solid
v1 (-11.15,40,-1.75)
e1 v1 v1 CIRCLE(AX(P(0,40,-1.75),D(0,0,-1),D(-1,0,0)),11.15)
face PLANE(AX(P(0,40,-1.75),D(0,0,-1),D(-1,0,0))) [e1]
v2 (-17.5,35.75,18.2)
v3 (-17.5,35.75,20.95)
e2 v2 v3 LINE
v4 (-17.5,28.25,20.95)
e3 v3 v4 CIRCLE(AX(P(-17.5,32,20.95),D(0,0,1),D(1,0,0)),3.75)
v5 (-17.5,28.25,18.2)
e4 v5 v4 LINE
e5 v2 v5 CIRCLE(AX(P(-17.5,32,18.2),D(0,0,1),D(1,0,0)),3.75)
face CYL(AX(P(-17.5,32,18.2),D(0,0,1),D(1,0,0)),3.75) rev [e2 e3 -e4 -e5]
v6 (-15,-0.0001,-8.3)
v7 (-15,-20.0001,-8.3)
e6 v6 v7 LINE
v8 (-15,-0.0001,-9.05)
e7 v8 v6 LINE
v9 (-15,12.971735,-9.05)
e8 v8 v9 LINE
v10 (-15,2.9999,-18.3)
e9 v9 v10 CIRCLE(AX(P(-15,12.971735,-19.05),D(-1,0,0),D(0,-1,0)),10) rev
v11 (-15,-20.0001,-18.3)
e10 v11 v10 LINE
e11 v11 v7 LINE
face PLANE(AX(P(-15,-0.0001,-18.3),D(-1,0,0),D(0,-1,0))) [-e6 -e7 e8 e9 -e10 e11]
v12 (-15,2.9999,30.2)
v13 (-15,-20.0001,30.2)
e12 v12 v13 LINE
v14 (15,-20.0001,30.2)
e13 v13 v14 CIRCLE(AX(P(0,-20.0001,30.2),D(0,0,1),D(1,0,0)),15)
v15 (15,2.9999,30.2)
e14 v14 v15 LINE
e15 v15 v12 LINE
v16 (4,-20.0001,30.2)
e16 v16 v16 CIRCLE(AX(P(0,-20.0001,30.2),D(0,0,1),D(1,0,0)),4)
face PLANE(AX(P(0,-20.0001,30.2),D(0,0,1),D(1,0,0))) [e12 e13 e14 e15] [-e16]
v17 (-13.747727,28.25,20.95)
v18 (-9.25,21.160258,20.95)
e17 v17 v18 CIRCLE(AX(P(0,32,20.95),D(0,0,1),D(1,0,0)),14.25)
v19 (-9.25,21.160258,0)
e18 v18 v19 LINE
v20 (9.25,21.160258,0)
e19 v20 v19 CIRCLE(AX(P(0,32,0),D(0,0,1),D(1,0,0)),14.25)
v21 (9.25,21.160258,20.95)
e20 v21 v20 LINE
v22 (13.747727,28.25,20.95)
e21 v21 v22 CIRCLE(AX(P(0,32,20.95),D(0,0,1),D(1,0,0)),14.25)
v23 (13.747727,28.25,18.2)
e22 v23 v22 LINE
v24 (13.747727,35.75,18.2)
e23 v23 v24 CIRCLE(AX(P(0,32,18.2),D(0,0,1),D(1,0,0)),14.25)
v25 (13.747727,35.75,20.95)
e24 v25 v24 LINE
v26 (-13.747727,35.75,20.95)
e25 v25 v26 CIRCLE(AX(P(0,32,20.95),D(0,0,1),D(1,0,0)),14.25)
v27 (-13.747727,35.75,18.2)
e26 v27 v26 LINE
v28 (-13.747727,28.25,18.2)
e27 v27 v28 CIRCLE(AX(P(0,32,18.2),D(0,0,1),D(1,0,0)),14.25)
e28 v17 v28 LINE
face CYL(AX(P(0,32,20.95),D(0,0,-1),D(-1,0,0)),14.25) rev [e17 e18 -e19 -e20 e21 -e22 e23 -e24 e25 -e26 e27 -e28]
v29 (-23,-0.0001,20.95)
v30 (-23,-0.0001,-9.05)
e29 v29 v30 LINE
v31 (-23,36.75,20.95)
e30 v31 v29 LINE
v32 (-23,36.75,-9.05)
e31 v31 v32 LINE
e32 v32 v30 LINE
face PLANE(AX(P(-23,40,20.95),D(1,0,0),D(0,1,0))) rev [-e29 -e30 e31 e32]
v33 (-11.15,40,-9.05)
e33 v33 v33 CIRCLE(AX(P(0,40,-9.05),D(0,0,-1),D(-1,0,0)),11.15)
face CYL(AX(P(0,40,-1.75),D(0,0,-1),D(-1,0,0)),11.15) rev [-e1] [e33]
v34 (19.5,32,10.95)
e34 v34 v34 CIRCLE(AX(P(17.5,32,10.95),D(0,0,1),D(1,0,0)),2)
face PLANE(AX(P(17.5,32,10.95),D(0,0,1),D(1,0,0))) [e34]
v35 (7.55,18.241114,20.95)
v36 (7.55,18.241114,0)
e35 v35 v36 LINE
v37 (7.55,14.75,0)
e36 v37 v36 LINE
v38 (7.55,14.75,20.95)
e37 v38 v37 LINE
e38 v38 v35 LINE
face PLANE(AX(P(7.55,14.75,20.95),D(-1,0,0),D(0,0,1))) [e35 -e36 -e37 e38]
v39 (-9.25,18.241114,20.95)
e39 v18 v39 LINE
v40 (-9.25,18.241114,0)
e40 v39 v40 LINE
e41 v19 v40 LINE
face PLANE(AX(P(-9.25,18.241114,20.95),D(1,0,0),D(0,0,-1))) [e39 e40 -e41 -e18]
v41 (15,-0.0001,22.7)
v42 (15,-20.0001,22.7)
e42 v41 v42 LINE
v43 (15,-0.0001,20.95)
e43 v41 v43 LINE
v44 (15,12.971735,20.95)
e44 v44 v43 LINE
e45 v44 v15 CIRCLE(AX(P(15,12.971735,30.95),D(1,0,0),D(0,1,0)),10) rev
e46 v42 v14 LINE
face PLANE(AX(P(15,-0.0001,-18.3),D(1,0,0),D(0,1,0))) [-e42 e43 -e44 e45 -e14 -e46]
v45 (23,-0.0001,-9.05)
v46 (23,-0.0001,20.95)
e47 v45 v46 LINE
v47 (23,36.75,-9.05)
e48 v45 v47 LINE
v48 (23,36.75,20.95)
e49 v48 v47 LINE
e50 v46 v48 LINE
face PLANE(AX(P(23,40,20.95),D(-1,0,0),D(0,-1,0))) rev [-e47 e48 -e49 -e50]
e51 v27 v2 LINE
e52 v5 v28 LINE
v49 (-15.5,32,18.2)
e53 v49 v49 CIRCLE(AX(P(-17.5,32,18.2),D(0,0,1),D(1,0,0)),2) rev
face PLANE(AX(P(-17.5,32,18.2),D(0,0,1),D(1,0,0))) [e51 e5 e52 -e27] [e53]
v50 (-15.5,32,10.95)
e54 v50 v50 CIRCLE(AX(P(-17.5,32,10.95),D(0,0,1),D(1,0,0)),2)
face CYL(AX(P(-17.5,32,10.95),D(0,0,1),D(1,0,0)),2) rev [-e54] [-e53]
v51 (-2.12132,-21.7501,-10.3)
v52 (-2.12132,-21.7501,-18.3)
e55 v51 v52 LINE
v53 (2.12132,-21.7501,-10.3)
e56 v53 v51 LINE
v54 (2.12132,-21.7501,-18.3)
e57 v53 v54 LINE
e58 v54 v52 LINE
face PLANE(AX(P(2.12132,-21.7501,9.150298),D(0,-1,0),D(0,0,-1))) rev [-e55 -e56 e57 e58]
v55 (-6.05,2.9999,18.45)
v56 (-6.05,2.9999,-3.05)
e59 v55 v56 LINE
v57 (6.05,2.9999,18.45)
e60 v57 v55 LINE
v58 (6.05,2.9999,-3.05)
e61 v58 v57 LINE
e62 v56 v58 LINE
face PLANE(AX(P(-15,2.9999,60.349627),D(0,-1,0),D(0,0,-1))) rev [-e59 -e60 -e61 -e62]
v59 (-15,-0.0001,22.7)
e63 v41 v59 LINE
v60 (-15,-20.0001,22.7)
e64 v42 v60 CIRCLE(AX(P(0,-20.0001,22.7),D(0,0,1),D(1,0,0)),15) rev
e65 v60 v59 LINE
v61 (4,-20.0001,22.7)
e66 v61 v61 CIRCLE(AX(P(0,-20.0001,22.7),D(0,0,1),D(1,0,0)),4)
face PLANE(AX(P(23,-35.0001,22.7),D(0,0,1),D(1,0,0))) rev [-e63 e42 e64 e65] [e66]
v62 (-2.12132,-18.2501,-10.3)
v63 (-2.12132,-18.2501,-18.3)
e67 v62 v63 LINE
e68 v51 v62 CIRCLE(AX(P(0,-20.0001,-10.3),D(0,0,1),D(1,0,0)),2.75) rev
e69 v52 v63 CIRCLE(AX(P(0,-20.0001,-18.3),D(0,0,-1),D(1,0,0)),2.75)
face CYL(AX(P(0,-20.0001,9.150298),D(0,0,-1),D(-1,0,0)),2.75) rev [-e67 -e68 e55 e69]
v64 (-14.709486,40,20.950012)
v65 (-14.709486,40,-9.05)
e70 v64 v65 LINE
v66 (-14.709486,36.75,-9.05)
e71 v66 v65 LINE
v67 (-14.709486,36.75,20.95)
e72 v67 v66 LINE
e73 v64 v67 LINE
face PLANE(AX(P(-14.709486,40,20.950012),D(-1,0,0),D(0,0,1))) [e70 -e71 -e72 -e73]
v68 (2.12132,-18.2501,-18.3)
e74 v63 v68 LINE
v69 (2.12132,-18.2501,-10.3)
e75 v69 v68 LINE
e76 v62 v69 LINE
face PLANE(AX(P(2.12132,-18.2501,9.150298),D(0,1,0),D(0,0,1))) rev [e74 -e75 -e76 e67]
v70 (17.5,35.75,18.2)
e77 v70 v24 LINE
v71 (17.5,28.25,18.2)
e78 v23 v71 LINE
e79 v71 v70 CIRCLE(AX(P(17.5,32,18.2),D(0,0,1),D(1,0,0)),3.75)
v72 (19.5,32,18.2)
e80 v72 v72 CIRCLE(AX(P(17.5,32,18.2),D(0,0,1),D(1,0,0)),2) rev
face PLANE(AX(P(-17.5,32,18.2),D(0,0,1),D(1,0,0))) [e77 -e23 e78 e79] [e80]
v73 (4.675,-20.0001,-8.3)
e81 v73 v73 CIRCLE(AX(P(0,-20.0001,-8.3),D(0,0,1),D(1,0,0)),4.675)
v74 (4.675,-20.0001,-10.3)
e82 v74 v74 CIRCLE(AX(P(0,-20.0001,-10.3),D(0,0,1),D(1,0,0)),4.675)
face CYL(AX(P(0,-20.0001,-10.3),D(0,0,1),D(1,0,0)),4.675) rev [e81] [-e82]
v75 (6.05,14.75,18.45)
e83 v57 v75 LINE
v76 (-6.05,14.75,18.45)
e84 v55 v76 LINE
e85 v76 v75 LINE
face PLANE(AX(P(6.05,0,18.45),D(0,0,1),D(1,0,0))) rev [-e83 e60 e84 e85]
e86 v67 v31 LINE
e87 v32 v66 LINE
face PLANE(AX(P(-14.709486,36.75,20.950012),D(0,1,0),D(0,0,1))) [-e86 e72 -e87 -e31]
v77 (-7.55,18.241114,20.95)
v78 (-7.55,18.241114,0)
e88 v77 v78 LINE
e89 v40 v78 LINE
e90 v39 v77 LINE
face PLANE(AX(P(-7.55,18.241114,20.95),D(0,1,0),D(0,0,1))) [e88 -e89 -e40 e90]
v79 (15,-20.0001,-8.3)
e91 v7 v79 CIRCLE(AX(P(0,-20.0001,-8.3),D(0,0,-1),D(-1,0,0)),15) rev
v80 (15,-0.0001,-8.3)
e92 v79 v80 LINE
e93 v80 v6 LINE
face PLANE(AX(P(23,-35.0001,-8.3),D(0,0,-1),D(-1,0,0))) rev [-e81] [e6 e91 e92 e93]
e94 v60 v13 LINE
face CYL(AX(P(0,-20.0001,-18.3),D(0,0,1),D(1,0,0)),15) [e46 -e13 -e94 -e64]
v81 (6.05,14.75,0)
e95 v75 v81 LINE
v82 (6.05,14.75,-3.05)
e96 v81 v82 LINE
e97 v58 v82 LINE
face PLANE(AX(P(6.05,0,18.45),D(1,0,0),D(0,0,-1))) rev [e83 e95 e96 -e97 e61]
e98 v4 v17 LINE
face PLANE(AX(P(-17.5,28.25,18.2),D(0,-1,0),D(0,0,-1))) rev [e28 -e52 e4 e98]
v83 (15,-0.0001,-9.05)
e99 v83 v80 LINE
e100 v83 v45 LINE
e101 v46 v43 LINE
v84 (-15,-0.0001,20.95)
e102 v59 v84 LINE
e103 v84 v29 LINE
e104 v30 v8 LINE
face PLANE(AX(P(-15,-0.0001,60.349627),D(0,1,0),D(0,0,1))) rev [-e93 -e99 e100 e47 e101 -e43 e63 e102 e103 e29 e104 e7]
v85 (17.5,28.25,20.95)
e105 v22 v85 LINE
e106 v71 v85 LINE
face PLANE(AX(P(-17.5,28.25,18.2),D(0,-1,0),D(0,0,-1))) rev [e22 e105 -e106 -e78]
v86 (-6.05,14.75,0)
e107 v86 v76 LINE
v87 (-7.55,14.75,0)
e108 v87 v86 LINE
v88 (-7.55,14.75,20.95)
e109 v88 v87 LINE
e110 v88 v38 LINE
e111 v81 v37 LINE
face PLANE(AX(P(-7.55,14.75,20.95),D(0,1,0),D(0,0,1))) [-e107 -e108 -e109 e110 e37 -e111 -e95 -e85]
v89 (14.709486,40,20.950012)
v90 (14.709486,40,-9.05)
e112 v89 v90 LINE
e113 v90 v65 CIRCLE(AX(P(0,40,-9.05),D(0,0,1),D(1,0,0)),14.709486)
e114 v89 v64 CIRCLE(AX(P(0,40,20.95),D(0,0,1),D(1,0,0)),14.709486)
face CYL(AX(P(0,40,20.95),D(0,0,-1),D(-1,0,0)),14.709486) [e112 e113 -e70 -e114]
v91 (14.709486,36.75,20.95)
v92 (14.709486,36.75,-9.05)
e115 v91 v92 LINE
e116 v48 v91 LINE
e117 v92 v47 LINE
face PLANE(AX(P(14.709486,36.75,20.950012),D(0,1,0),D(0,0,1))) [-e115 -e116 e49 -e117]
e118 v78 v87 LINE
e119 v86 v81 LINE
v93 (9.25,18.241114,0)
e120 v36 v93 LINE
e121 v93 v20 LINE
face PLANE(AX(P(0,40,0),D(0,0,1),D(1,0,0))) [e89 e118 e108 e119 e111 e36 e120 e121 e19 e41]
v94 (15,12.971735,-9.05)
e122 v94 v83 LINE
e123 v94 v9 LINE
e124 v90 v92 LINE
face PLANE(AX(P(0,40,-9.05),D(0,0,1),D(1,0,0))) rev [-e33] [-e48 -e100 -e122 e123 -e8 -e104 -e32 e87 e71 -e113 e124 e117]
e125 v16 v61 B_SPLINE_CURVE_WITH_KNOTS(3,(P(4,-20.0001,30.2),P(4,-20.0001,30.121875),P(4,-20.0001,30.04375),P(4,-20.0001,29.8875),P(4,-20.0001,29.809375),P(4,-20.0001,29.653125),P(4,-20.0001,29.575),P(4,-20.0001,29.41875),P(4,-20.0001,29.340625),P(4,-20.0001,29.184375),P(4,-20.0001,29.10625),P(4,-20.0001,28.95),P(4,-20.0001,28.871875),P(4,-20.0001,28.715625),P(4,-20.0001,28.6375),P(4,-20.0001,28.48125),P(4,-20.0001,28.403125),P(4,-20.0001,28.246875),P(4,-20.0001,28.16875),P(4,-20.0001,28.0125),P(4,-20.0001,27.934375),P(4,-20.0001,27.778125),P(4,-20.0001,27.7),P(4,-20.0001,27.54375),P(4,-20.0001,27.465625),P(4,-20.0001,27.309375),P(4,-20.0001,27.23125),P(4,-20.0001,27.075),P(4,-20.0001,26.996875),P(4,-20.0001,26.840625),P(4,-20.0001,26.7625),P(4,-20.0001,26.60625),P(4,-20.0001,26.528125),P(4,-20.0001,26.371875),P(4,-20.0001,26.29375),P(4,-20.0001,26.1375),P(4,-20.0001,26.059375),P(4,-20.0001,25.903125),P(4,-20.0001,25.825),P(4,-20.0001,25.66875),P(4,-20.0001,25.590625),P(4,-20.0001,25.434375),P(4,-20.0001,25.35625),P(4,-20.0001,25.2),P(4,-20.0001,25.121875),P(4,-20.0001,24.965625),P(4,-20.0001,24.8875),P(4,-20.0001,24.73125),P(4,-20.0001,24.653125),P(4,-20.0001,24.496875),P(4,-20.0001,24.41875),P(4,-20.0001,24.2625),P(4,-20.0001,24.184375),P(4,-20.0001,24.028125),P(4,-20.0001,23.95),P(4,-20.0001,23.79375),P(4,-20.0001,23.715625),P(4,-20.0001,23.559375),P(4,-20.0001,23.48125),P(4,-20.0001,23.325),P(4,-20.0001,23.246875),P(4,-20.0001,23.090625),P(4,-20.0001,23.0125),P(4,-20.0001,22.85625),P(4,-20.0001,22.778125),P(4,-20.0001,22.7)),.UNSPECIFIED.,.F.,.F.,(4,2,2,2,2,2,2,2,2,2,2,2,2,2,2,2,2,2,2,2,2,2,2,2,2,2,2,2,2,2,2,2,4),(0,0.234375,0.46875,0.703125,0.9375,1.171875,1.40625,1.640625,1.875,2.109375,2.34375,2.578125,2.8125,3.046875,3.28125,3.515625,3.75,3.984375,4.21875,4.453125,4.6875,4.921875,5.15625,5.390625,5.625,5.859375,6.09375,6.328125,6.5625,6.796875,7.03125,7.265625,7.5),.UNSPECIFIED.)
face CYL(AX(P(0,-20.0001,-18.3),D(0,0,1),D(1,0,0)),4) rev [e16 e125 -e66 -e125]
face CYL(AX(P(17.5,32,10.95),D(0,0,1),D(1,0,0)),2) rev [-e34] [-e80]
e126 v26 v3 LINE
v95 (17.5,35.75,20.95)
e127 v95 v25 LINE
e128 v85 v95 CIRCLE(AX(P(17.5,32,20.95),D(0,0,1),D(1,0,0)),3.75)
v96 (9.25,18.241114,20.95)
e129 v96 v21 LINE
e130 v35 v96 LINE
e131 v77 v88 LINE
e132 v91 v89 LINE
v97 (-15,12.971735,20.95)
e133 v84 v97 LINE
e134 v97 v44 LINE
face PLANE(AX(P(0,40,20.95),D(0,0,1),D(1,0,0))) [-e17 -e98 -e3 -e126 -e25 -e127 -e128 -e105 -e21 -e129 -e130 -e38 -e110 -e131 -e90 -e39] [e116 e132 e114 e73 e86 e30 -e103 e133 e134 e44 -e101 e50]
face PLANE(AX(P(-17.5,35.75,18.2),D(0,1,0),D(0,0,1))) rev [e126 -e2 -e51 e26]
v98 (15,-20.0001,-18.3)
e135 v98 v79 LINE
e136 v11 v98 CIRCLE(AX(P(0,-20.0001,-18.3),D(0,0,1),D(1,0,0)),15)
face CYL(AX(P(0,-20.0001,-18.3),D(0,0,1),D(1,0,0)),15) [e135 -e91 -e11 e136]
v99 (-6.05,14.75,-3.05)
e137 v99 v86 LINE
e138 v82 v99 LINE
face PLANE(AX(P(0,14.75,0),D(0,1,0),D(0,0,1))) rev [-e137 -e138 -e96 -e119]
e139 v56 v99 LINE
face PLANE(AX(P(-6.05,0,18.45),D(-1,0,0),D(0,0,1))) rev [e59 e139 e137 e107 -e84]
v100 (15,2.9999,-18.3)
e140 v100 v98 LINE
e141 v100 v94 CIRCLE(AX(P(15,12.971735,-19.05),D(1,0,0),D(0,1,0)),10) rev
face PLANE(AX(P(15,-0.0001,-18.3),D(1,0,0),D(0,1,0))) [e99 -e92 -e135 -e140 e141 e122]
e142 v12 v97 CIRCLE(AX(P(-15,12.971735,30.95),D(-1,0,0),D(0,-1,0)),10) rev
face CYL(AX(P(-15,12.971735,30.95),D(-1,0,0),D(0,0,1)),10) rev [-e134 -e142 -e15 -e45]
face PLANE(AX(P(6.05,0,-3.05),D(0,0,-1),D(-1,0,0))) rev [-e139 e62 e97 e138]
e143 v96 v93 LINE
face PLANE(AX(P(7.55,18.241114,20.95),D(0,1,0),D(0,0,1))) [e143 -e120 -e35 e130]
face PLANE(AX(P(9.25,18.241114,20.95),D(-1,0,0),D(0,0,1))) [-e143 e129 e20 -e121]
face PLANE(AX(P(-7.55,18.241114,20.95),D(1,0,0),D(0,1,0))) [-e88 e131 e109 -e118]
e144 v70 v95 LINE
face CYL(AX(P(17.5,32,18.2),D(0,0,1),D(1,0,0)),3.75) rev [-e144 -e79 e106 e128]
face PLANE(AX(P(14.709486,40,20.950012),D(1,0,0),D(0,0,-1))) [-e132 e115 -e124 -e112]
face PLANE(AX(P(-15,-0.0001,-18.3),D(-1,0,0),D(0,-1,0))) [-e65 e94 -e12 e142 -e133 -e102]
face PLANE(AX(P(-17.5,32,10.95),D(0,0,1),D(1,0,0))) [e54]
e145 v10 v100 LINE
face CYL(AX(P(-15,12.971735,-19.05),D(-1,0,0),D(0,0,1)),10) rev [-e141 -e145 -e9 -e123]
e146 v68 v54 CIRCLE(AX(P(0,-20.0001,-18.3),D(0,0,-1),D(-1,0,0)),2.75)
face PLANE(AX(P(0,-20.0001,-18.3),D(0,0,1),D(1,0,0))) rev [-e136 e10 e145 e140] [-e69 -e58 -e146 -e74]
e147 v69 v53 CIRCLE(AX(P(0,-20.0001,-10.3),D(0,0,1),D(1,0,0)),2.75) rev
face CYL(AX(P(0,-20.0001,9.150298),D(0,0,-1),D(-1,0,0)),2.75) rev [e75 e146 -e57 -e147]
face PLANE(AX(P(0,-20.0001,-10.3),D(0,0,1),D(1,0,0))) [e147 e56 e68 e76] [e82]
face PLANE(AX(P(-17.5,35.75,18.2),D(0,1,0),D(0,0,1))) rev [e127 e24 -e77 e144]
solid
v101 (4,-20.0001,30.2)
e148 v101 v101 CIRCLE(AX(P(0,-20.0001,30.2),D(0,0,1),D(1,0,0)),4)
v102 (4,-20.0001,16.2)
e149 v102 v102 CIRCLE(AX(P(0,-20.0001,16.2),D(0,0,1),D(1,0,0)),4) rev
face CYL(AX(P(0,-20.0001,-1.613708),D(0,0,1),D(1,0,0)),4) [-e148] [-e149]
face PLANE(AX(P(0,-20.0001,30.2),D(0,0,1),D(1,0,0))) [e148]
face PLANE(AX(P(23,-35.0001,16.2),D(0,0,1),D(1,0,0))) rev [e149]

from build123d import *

# Parameters (mm, degrees)
BOSS_EXTRUDE1_DEPTH      = 20.95
BOSS_EXTRUDE2_START      = -9.05
BOSS_EXTRUDE2_DEPTH      = 9.05
SKETCH6_R                = 2
CUT_EXTRUDE2_DEPTH       = 10
CUT_EXTRUDE3_DEPTH       = 2.75
CUT_EXTRUDE4_DEPTH       = 67.499081444
CUT_EXTRUDE4_DEPTH_BACK  = 67.499081444
SKETCH8_W                = 8.290514233
SKETCH8_H                = 3.25
SKETCH11_R               = 11.15
BEARING_HOLE_DEPTH       = 7.3
SKETCH9_W                = 12.1
SKETCH9_H                = 21.5
WIRE_HOLE_DEPTH          = 62.170258319
SKETCH12_W               = 46
SKETCH12_H               = 30
BOSS_EXTRUDE3_DEPTH      = 0.0001
BOSS_EXTRUDE4_DEPTH      = 9.25
BOSS_EXTRUDE4_DEPTH_BACK = 39.25
SKETCH14_W               = 31
SKETCH14_H               = 35
CUT_EXTRUDE5_DEPTH       = 74.138005393
SKETCH15_R               = 4
CUT_EXTRUDE6_DEPTH       = 77.644489906
SKETCH17_R               = 6.169612062
BOSS_EXTRUDE5_DEPTH      = 10
SKETCH18_R               = 4
BOSS_EXTRUDE6_DEPTH      = 14
SKETCH19_R               = 4.675
CUT_EXTRUDE7_DEPTH       = 2
BOSS_EXTRUDE7_START      = -39.25
SKETCH20_W               = 30
SKETCH20_H               = 3
BOSS_EXTRUDE7_DEPTH      = 48.5
FILLET1_R                = 10


with BuildPart() as part:
    # Sketch2 → Boss-Extrude1 (new body)
    with BuildSketch(Plane.XY):
        with BuildLine():
            Line((-14.709485767, 40), (-23, 40))
            Line((-23, 40), (-23, 0))
            Line((-23, 0), (23, 0))
            Line((23, 0), (23, 40))
            Line((23, 40), (14.709485767, 40))
            ThreePointArc((14.709485767, 40), (0, 54.709485767), (-14.709485767, 40))
        make_face()
        with BuildLine():
            Line((-7.55, 18.241114036), (-7.55, 14.75))
            Line((-7.55, 14.75), (7.55, 14.75))
            Line((7.55, 14.75), (7.55, 18.241114036))
            Line((7.55, 18.241114036), (9.25, 18.241114036))
            Line((9.25, 18.241114036), (9.25, 21.160258306))
            ThreePointArc((9.25, 21.160258306), (0, 46.25), (-9.25, 21.160258306))
            Line((-9.25, 21.160258306), (-9.25, 18.241114036))
            Line((-9.25, 18.241114036), (-7.55, 18.241114036))
        make_face(mode=Mode.SUBTRACT)
    extrude(amount=BOSS_EXTRUDE1_DEPTH)

    # Sketch3 → Boss-Extrude2 (add)
    with BuildSketch(Plane.XY.offset(BOSS_EXTRUDE2_START)):
        with BuildLine():
            Line((-14.709485767, 40), (-23, 40))
            Line((-23, 40), (-23, 0))
            Line((-23, 0), (23, 0))
            Line((23, 0), (23, 40))
            Line((23, 40), (14.709485767, 40))
            ThreePointArc((14.709485767, 40), (0, 54.709485767), (-14.709485767, 40))
        make_face()
    extrude(amount=BOSS_EXTRUDE2_DEPTH)

    # Sketch6 → Cut-Extrude2 (cut)
    with BuildSketch(Plane.XY.offset(20.95)):
        with Locations((-17.5, 32)):
            Circle(SKETCH6_R)
        with Locations((17.5, 32)):
            Circle(SKETCH6_R)
    extrude(amount=-CUT_EXTRUDE2_DEPTH, mode=Mode.SUBTRACT)

    # Sketch7 → Cut-Extrude3 (cut)
    with BuildSketch(Plane.XY.offset(20.95)):
        with BuildLine():
            Line((-17.5, 35.75), (17.5, 35.75))
            ThreePointArc((17.5, 35.75), (21.25, 32), (17.5, 28.25))
            Line((17.5, 28.25), (-17.5, 28.25))
            ThreePointArc((-17.5, 28.25), (-21.25, 32), (-17.5, 35.75))
        make_face()
    extrude(amount=-CUT_EXTRUDE3_DEPTH, mode=Mode.SUBTRACT)

    # Sketch8 → Cut-Extrude4 (cut, two sides: drawn at the far end of the back side and taken through both)
    with BuildSketch(Plane.XY.offset(20.95).offset(-CUT_EXTRUDE4_DEPTH_BACK)):
        with Locations((-18.854742884, 38.375)):
            Rectangle(SKETCH8_W, SKETCH8_H)
        with Locations((18.854742884, 38.375)):
            Rectangle(SKETCH8_W, SKETCH8_H)
    extrude(amount=CUT_EXTRUDE4_DEPTH + CUT_EXTRUDE4_DEPTH_BACK, mode=Mode.SUBTRACT)

    # Sketch11 → Bearing Hole (cut)
    with BuildSketch(Plane(origin=(0, 0, -9.05), x_dir=(-1, 0, 0), z_dir=(0, 0, -1))):
        with Locations((0, 40)):
            Circle(SKETCH11_R)
    extrude(amount=-BEARING_HOLE_DEPTH, mode=Mode.SUBTRACT)

    # Sketch9 → Wire Hole (cut, through all)
    with BuildSketch(Plane(origin=(0, 14.75, -19.25), x_dir=(-1, 0, 0), z_dir=(0, 1, 0))):
        with Locations((0, 26.95)):
            Rectangle(SKETCH9_W, SKETCH9_H)
    extrude(amount=-WIRE_HOLE_DEPTH, mode=Mode.SUBTRACT)

    # Sketch12 → Boss-Extrude3 (add)
    with BuildSketch(Plane.XZ):
        with Locations((0, 5.95)):
            Rectangle(SKETCH12_W, SKETCH12_H)
    extrude(amount=BOSS_EXTRUDE3_DEPTH)

    # Sketch13 → Boss-Extrude4 (add, two sides: drawn at the far end of the back side and taken through both)
    with BuildSketch(Plane.XY.offset(20.95).offset(-BOSS_EXTRUDE4_DEPTH_BACK)):
        with BuildLine():
            Line((-15, -0.0001), (15, -0.0001))
            Line((15, -0.0001), (15, -20.0001))
            ThreePointArc((15, -20.0001), (0, -35.0001), (-15, -20.0001))
            Line((-15, -20.0001), (-15, -0.0001))
        make_face()
    extrude(amount=BOSS_EXTRUDE4_DEPTH + BOSS_EXTRUDE4_DEPTH_BACK)

    # Sketch14 → Cut-Extrude5 (cut, through all)
    with BuildSketch(Plane.ZY.offset(15)):
        with Locations((7.2, -17.5001)):
            Rectangle(SKETCH14_W, SKETCH14_H)
    extrude(amount=-CUT_EXTRUDE5_DEPTH, mode=Mode.SUBTRACT)


with BuildPart() as cut_extrude5_piece_1:
    # of the separate pieces the step leaves, piece 1, a body of its own (cut_extrude5_pieces)
    add(part.part.solids().sort_by_distance((14.709485767, 40, 20.95))[0])


with BuildPart() as cut_extrude5_piece_2:
    # of the separate pieces the step leaves, piece 2, a body of its own (cut_extrude5_pieces)
    add(part.part.solids().sort_by_distance((-15, -0.0001, 30.2))[0])


with BuildPart() as cut_extrude6_tool:
    # Sketch15 → Cut-Extrude6 (new, through all)
    with BuildSketch(Plane.XY.offset(30.2)):
        with Locations((0, -20.0001)):
            Circle(SKETCH15_R)
    extrude(amount=-CUT_EXTRUDE6_DEPTH)


with BuildPart() as cut_extrude5_piece_1_1:
    add(cut_extrude5_piece_1.part)

    # Cut-Extrude6: cut by cut_extrude6_tool
    add(cut_extrude6_tool.part, mode=Mode.SUBTRACT)

    # Sketch17 → Boss-Extrude5 (add)
    with BuildSketch(Plane(origin=(0, 0, -18.3), x_dir=(-1, 0, 0), z_dir=(0, 0, -1))):
        with Locations((0, -20.0001)):
            Circle(SKETCH17_R)
        with BuildLine():
            Line((-2.121320344, -18.2501), (2.121320344, -18.2501))
            ThreePointArc((2.121320344, -18.2501), (2.75, -20.0001), (2.121320344, -21.7501))
            Line((2.121320344, -21.7501), (-2.121320344, -21.7501))
            ThreePointArc((-2.121320344, -21.7501), (-2.75, -20.0001), (-2.121320344, -18.2501))
        make_face(mode=Mode.SUBTRACT)
    extrude(amount=-BOSS_EXTRUDE5_DEPTH)

    # Sketch19 → Cut-Extrude7 (cut)
    with BuildSketch(Plane.XY.offset(-8.3)):
        with Locations((0, -20.0001)):
            Circle(SKETCH19_R)
    extrude(amount=-CUT_EXTRUDE7_DEPTH, mode=Mode.SUBTRACT)



with BuildPart() as cut_extrude5_piece_2_1:
    add(cut_extrude5_piece_2.part)

    # Cut-Extrude6: cut by cut_extrude6_tool
    add(cut_extrude6_tool.part, mode=Mode.SUBTRACT)


with BuildPart() as body_3:
    # Sketch18 → Boss-Extrude6 (new body)
    with BuildSketch(Plane.XY.offset(30.2)):
        with Locations((0, -20.0001)):
            Circle(SKETCH18_R)
    extrude(amount=-BOSS_EXTRUDE6_DEPTH)


with BuildPart() as cut_extrude5_piece_1_2:
    add(cut_extrude5_piece_1_1.part)

    add(cut_extrude5_piece_2_1.part)  # Boss-Extrude7 merges Cut-Extrude5 piece 2
    # Sketch20 → Boss-Extrude7 (add)
    with BuildSketch(Plane.XY.offset(20.95).offset(BOSS_EXTRUDE7_START)):
        with Locations((0, 1.4999)):
            Rectangle(SKETCH20_W, SKETCH20_H)
    extrude(amount=BOSS_EXTRUDE7_DEPTH)

    # Fillet1
    # the kernel refuses this fillet: 10 mm, written as the material it adds along each edge
    with BuildSketch(Plane(origin=(-15, 2.9999, -9.05), x_dir=(0, 0, -1), z_dir=(1, 0, 0))) as fillet1_piece_1:
        with BuildLine():
            CenterArc((10, 9.971835338), FILLET1_R, 180, 85.698777695)
            Line((0, 9.971835338), (-0.2, 9.971835338))
            Line((-0.2, 9.971835338), (-0.2, 0))
            Line((-0.2, 0), (0, -0.2))
            ThreePointArc((0, -0.2), (4.625, -0.2), (9.235, -0.199436707))
            Line((9.235, -0.199436707), (9.25, 0))
        make_face()
    extrude(amount=30)
    with BuildSketch(Plane(origin=(-15, 2.9999, 20.95), x_dir=(0, 1, 0), z_dir=(1, 0, 0))) as fillet1_piece_2:
        with BuildLine():
            CenterArc((9.971835338, 10), FILLET1_R, 184.301222305, 85.698777695)
            Line((0, 9.25), (-0.199436707, 9.235))
            ThreePointArc((-0.199436707, 9.235), (-0.2, 4.625), (-0.2, 0))
            Line((-0.2, 0), (0, -0.2))
            Line((0, -0.2), (9.971835338, -0.2))
            Line((9.971835338, -0.2), (9.971835338, 0))
        make_face()
    extrude(amount=30)


solid = Compound([body_3.part, cut_extrude5_piece_1_2.part])
